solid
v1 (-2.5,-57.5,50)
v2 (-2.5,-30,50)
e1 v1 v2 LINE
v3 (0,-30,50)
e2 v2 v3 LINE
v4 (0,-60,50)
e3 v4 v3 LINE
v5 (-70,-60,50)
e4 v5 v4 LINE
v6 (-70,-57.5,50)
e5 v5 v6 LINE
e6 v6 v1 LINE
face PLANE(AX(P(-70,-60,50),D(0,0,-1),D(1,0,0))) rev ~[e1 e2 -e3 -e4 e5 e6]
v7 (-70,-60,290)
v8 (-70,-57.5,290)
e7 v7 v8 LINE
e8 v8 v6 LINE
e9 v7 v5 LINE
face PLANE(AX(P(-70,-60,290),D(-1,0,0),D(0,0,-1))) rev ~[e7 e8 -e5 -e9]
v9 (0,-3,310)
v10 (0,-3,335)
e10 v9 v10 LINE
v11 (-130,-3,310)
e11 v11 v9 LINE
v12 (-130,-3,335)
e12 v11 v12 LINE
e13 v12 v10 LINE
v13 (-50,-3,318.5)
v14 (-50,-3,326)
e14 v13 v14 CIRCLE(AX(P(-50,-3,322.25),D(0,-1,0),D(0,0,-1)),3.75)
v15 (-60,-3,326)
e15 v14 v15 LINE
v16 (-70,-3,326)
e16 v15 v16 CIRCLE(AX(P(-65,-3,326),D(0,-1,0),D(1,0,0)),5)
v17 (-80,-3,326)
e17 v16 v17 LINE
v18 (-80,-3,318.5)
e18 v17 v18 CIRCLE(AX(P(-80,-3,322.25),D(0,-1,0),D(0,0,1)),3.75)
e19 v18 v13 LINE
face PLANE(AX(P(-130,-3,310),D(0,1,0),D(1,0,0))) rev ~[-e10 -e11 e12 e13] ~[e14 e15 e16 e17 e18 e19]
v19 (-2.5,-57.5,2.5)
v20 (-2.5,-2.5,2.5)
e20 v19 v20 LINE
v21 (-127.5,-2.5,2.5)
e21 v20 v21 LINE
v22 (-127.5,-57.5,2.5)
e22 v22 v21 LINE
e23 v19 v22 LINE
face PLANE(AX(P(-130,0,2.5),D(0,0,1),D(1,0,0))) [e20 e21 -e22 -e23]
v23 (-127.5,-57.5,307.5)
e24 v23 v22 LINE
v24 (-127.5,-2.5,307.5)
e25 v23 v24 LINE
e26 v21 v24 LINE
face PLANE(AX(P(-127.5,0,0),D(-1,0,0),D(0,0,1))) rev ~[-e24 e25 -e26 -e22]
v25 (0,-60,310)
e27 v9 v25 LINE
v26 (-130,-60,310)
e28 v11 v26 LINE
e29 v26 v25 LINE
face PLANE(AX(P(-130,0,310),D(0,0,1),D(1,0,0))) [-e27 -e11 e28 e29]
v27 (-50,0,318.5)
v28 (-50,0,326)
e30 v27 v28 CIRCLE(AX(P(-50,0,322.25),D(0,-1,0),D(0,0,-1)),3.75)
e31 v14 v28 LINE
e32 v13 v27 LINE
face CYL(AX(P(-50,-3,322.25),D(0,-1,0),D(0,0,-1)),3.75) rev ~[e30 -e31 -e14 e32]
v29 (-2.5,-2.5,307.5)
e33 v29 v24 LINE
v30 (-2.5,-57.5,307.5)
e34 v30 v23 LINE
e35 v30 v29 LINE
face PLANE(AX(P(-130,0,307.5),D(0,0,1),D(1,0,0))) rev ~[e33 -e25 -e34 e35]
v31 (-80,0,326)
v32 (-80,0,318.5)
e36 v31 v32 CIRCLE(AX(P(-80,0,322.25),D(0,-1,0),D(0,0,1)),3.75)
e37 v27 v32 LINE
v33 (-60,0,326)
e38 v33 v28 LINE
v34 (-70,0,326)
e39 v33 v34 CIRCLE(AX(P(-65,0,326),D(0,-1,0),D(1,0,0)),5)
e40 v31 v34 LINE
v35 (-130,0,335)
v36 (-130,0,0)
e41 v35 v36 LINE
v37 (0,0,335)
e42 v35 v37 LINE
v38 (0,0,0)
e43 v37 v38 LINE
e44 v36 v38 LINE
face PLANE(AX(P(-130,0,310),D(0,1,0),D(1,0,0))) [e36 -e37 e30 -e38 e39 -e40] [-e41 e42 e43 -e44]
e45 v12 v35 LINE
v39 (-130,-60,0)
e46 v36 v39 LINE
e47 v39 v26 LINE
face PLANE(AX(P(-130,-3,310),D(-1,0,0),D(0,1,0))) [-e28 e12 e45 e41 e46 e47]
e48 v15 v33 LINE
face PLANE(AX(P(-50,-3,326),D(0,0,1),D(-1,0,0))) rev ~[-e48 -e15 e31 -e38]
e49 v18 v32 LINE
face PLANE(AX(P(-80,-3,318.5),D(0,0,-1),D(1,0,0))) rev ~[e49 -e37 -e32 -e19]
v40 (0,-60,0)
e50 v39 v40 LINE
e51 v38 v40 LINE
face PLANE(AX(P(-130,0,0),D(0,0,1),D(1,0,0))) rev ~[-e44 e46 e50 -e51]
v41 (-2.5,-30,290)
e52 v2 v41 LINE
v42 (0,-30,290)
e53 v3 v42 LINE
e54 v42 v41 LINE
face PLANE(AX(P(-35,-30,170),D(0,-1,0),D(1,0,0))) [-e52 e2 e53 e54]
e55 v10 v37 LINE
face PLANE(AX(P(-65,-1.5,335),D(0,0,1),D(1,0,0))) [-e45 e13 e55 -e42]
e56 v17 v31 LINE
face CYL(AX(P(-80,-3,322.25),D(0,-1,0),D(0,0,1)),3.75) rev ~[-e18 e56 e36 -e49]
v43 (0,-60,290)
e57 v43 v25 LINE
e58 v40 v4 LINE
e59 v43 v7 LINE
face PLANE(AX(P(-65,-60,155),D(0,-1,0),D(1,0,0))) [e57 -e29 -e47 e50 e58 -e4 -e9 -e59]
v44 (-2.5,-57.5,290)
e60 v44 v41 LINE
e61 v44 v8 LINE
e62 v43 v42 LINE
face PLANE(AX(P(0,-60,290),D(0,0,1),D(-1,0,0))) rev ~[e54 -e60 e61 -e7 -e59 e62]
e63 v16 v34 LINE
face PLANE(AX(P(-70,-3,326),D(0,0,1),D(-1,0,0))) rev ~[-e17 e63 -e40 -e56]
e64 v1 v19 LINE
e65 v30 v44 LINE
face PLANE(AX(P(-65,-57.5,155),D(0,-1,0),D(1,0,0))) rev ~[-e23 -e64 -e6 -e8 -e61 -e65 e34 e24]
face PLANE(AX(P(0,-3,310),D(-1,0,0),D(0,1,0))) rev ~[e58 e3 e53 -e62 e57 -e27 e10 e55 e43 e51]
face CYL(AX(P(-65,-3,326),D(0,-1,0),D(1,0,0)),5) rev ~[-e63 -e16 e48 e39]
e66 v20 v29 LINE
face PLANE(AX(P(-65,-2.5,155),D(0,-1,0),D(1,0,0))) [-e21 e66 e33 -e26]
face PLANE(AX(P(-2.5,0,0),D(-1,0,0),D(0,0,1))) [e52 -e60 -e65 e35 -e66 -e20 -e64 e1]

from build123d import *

# Parameters (mm, degrees)
F0_W      = 130
F0_H      = 310
F1_DEPTH  = 60
F3_DEPTH  = 30
F4_T      = -2.5
F5_W      = 130
F5_H      = 3
F6_DEPTH  = 25
F10_DEPTH = 3.001
F11_DEPTH = 25
F12_DEPTH = 3.001


# Not quite as in the source:
# - a feature of the source that left no trace in its solid (it failed there, or was rolled back) is left out


with BuildPart() as f1:
    # F0 (on Front) → F1 (new body)
    with BuildSketch(Plane.XZ):
        with Locations((-65, 155)):
            Rectangle(F0_W, F0_H)
    extrude(amount=F1_DEPTH)

    # F2 (on face) → F3 (cut)
    with BuildSketch(Plane.XZ.offset(60)):
        Polygon((0, 50), (0, 290), (-70, 290), (-70, 50), (-48.1321327388, 50), align=None)
    extrude(amount=-F3_DEPTH, mode=Mode.SUBTRACT)

    # F4
    f4_openings = [f1.faces().sort_by_distance(p)[0] for p in [
        (-35, -45, 50),
        (-70, -45, 170),
        (-35, -30, 170),
        (-35, -45, 290),
    ]]
    offset(amount=F4_T, openings=f4_openings)

    # F5 (on face) → F6 (join)
    with BuildSketch(Plane.XY.offset(310)):
        with Locations((-65, -1.5)):
            Rectangle(F5_W, F5_H)
    extrude(amount=F6_DEPTH)

    # F9 (on face) → F10 (cut, through all)
    with BuildSketch(Plane.XZ.offset(3)):
        with BuildLine():
            Line((-50, 326), (-60, 326))
            ThreePointArc((-60, 326), (-65, 331), (-70, 326))
            Line((-70, 326), (-80, 326))
            ThreePointArc((-80, 326), (-83.75, 322.25), (-80, 318.5))
            Line((-80, 318.5), (-50, 318.5))
            ThreePointArc((-50, 318.5), (-46.25, 322.25), (-50, 326))
        make_face()
    extrude(amount=-F10_DEPTH, mode=Mode.SUBTRACT)

    # F5 (on face) → F11 (join)
    with BuildSketch(Plane.XY.offset(310)):
        with Locations((-65, -1.5)):
            Rectangle(F5_W, F5_H)
    extrude(amount=F11_DEPTH)

    # F9 (on face) → F12 (cut, through all)
    with BuildSketch(Plane.XZ.offset(3)):
        with BuildLine():
            Line((-50, 326), (-60, 326))
            ThreePointArc((-60, 326), (-65, 331), (-70, 326))
            Line((-70, 326), (-80, 326))
            ThreePointArc((-80, 326), (-83.75, 322.25), (-80, 318.5))
            Line((-80, 318.5), (-50, 318.5))
            ThreePointArc((-50, 318.5), (-46.25, 322.25), (-50, 326))
        make_face()
    extrude(amount=-F12_DEPTH, mode=Mode.SUBTRACT)


solid = f1.part
